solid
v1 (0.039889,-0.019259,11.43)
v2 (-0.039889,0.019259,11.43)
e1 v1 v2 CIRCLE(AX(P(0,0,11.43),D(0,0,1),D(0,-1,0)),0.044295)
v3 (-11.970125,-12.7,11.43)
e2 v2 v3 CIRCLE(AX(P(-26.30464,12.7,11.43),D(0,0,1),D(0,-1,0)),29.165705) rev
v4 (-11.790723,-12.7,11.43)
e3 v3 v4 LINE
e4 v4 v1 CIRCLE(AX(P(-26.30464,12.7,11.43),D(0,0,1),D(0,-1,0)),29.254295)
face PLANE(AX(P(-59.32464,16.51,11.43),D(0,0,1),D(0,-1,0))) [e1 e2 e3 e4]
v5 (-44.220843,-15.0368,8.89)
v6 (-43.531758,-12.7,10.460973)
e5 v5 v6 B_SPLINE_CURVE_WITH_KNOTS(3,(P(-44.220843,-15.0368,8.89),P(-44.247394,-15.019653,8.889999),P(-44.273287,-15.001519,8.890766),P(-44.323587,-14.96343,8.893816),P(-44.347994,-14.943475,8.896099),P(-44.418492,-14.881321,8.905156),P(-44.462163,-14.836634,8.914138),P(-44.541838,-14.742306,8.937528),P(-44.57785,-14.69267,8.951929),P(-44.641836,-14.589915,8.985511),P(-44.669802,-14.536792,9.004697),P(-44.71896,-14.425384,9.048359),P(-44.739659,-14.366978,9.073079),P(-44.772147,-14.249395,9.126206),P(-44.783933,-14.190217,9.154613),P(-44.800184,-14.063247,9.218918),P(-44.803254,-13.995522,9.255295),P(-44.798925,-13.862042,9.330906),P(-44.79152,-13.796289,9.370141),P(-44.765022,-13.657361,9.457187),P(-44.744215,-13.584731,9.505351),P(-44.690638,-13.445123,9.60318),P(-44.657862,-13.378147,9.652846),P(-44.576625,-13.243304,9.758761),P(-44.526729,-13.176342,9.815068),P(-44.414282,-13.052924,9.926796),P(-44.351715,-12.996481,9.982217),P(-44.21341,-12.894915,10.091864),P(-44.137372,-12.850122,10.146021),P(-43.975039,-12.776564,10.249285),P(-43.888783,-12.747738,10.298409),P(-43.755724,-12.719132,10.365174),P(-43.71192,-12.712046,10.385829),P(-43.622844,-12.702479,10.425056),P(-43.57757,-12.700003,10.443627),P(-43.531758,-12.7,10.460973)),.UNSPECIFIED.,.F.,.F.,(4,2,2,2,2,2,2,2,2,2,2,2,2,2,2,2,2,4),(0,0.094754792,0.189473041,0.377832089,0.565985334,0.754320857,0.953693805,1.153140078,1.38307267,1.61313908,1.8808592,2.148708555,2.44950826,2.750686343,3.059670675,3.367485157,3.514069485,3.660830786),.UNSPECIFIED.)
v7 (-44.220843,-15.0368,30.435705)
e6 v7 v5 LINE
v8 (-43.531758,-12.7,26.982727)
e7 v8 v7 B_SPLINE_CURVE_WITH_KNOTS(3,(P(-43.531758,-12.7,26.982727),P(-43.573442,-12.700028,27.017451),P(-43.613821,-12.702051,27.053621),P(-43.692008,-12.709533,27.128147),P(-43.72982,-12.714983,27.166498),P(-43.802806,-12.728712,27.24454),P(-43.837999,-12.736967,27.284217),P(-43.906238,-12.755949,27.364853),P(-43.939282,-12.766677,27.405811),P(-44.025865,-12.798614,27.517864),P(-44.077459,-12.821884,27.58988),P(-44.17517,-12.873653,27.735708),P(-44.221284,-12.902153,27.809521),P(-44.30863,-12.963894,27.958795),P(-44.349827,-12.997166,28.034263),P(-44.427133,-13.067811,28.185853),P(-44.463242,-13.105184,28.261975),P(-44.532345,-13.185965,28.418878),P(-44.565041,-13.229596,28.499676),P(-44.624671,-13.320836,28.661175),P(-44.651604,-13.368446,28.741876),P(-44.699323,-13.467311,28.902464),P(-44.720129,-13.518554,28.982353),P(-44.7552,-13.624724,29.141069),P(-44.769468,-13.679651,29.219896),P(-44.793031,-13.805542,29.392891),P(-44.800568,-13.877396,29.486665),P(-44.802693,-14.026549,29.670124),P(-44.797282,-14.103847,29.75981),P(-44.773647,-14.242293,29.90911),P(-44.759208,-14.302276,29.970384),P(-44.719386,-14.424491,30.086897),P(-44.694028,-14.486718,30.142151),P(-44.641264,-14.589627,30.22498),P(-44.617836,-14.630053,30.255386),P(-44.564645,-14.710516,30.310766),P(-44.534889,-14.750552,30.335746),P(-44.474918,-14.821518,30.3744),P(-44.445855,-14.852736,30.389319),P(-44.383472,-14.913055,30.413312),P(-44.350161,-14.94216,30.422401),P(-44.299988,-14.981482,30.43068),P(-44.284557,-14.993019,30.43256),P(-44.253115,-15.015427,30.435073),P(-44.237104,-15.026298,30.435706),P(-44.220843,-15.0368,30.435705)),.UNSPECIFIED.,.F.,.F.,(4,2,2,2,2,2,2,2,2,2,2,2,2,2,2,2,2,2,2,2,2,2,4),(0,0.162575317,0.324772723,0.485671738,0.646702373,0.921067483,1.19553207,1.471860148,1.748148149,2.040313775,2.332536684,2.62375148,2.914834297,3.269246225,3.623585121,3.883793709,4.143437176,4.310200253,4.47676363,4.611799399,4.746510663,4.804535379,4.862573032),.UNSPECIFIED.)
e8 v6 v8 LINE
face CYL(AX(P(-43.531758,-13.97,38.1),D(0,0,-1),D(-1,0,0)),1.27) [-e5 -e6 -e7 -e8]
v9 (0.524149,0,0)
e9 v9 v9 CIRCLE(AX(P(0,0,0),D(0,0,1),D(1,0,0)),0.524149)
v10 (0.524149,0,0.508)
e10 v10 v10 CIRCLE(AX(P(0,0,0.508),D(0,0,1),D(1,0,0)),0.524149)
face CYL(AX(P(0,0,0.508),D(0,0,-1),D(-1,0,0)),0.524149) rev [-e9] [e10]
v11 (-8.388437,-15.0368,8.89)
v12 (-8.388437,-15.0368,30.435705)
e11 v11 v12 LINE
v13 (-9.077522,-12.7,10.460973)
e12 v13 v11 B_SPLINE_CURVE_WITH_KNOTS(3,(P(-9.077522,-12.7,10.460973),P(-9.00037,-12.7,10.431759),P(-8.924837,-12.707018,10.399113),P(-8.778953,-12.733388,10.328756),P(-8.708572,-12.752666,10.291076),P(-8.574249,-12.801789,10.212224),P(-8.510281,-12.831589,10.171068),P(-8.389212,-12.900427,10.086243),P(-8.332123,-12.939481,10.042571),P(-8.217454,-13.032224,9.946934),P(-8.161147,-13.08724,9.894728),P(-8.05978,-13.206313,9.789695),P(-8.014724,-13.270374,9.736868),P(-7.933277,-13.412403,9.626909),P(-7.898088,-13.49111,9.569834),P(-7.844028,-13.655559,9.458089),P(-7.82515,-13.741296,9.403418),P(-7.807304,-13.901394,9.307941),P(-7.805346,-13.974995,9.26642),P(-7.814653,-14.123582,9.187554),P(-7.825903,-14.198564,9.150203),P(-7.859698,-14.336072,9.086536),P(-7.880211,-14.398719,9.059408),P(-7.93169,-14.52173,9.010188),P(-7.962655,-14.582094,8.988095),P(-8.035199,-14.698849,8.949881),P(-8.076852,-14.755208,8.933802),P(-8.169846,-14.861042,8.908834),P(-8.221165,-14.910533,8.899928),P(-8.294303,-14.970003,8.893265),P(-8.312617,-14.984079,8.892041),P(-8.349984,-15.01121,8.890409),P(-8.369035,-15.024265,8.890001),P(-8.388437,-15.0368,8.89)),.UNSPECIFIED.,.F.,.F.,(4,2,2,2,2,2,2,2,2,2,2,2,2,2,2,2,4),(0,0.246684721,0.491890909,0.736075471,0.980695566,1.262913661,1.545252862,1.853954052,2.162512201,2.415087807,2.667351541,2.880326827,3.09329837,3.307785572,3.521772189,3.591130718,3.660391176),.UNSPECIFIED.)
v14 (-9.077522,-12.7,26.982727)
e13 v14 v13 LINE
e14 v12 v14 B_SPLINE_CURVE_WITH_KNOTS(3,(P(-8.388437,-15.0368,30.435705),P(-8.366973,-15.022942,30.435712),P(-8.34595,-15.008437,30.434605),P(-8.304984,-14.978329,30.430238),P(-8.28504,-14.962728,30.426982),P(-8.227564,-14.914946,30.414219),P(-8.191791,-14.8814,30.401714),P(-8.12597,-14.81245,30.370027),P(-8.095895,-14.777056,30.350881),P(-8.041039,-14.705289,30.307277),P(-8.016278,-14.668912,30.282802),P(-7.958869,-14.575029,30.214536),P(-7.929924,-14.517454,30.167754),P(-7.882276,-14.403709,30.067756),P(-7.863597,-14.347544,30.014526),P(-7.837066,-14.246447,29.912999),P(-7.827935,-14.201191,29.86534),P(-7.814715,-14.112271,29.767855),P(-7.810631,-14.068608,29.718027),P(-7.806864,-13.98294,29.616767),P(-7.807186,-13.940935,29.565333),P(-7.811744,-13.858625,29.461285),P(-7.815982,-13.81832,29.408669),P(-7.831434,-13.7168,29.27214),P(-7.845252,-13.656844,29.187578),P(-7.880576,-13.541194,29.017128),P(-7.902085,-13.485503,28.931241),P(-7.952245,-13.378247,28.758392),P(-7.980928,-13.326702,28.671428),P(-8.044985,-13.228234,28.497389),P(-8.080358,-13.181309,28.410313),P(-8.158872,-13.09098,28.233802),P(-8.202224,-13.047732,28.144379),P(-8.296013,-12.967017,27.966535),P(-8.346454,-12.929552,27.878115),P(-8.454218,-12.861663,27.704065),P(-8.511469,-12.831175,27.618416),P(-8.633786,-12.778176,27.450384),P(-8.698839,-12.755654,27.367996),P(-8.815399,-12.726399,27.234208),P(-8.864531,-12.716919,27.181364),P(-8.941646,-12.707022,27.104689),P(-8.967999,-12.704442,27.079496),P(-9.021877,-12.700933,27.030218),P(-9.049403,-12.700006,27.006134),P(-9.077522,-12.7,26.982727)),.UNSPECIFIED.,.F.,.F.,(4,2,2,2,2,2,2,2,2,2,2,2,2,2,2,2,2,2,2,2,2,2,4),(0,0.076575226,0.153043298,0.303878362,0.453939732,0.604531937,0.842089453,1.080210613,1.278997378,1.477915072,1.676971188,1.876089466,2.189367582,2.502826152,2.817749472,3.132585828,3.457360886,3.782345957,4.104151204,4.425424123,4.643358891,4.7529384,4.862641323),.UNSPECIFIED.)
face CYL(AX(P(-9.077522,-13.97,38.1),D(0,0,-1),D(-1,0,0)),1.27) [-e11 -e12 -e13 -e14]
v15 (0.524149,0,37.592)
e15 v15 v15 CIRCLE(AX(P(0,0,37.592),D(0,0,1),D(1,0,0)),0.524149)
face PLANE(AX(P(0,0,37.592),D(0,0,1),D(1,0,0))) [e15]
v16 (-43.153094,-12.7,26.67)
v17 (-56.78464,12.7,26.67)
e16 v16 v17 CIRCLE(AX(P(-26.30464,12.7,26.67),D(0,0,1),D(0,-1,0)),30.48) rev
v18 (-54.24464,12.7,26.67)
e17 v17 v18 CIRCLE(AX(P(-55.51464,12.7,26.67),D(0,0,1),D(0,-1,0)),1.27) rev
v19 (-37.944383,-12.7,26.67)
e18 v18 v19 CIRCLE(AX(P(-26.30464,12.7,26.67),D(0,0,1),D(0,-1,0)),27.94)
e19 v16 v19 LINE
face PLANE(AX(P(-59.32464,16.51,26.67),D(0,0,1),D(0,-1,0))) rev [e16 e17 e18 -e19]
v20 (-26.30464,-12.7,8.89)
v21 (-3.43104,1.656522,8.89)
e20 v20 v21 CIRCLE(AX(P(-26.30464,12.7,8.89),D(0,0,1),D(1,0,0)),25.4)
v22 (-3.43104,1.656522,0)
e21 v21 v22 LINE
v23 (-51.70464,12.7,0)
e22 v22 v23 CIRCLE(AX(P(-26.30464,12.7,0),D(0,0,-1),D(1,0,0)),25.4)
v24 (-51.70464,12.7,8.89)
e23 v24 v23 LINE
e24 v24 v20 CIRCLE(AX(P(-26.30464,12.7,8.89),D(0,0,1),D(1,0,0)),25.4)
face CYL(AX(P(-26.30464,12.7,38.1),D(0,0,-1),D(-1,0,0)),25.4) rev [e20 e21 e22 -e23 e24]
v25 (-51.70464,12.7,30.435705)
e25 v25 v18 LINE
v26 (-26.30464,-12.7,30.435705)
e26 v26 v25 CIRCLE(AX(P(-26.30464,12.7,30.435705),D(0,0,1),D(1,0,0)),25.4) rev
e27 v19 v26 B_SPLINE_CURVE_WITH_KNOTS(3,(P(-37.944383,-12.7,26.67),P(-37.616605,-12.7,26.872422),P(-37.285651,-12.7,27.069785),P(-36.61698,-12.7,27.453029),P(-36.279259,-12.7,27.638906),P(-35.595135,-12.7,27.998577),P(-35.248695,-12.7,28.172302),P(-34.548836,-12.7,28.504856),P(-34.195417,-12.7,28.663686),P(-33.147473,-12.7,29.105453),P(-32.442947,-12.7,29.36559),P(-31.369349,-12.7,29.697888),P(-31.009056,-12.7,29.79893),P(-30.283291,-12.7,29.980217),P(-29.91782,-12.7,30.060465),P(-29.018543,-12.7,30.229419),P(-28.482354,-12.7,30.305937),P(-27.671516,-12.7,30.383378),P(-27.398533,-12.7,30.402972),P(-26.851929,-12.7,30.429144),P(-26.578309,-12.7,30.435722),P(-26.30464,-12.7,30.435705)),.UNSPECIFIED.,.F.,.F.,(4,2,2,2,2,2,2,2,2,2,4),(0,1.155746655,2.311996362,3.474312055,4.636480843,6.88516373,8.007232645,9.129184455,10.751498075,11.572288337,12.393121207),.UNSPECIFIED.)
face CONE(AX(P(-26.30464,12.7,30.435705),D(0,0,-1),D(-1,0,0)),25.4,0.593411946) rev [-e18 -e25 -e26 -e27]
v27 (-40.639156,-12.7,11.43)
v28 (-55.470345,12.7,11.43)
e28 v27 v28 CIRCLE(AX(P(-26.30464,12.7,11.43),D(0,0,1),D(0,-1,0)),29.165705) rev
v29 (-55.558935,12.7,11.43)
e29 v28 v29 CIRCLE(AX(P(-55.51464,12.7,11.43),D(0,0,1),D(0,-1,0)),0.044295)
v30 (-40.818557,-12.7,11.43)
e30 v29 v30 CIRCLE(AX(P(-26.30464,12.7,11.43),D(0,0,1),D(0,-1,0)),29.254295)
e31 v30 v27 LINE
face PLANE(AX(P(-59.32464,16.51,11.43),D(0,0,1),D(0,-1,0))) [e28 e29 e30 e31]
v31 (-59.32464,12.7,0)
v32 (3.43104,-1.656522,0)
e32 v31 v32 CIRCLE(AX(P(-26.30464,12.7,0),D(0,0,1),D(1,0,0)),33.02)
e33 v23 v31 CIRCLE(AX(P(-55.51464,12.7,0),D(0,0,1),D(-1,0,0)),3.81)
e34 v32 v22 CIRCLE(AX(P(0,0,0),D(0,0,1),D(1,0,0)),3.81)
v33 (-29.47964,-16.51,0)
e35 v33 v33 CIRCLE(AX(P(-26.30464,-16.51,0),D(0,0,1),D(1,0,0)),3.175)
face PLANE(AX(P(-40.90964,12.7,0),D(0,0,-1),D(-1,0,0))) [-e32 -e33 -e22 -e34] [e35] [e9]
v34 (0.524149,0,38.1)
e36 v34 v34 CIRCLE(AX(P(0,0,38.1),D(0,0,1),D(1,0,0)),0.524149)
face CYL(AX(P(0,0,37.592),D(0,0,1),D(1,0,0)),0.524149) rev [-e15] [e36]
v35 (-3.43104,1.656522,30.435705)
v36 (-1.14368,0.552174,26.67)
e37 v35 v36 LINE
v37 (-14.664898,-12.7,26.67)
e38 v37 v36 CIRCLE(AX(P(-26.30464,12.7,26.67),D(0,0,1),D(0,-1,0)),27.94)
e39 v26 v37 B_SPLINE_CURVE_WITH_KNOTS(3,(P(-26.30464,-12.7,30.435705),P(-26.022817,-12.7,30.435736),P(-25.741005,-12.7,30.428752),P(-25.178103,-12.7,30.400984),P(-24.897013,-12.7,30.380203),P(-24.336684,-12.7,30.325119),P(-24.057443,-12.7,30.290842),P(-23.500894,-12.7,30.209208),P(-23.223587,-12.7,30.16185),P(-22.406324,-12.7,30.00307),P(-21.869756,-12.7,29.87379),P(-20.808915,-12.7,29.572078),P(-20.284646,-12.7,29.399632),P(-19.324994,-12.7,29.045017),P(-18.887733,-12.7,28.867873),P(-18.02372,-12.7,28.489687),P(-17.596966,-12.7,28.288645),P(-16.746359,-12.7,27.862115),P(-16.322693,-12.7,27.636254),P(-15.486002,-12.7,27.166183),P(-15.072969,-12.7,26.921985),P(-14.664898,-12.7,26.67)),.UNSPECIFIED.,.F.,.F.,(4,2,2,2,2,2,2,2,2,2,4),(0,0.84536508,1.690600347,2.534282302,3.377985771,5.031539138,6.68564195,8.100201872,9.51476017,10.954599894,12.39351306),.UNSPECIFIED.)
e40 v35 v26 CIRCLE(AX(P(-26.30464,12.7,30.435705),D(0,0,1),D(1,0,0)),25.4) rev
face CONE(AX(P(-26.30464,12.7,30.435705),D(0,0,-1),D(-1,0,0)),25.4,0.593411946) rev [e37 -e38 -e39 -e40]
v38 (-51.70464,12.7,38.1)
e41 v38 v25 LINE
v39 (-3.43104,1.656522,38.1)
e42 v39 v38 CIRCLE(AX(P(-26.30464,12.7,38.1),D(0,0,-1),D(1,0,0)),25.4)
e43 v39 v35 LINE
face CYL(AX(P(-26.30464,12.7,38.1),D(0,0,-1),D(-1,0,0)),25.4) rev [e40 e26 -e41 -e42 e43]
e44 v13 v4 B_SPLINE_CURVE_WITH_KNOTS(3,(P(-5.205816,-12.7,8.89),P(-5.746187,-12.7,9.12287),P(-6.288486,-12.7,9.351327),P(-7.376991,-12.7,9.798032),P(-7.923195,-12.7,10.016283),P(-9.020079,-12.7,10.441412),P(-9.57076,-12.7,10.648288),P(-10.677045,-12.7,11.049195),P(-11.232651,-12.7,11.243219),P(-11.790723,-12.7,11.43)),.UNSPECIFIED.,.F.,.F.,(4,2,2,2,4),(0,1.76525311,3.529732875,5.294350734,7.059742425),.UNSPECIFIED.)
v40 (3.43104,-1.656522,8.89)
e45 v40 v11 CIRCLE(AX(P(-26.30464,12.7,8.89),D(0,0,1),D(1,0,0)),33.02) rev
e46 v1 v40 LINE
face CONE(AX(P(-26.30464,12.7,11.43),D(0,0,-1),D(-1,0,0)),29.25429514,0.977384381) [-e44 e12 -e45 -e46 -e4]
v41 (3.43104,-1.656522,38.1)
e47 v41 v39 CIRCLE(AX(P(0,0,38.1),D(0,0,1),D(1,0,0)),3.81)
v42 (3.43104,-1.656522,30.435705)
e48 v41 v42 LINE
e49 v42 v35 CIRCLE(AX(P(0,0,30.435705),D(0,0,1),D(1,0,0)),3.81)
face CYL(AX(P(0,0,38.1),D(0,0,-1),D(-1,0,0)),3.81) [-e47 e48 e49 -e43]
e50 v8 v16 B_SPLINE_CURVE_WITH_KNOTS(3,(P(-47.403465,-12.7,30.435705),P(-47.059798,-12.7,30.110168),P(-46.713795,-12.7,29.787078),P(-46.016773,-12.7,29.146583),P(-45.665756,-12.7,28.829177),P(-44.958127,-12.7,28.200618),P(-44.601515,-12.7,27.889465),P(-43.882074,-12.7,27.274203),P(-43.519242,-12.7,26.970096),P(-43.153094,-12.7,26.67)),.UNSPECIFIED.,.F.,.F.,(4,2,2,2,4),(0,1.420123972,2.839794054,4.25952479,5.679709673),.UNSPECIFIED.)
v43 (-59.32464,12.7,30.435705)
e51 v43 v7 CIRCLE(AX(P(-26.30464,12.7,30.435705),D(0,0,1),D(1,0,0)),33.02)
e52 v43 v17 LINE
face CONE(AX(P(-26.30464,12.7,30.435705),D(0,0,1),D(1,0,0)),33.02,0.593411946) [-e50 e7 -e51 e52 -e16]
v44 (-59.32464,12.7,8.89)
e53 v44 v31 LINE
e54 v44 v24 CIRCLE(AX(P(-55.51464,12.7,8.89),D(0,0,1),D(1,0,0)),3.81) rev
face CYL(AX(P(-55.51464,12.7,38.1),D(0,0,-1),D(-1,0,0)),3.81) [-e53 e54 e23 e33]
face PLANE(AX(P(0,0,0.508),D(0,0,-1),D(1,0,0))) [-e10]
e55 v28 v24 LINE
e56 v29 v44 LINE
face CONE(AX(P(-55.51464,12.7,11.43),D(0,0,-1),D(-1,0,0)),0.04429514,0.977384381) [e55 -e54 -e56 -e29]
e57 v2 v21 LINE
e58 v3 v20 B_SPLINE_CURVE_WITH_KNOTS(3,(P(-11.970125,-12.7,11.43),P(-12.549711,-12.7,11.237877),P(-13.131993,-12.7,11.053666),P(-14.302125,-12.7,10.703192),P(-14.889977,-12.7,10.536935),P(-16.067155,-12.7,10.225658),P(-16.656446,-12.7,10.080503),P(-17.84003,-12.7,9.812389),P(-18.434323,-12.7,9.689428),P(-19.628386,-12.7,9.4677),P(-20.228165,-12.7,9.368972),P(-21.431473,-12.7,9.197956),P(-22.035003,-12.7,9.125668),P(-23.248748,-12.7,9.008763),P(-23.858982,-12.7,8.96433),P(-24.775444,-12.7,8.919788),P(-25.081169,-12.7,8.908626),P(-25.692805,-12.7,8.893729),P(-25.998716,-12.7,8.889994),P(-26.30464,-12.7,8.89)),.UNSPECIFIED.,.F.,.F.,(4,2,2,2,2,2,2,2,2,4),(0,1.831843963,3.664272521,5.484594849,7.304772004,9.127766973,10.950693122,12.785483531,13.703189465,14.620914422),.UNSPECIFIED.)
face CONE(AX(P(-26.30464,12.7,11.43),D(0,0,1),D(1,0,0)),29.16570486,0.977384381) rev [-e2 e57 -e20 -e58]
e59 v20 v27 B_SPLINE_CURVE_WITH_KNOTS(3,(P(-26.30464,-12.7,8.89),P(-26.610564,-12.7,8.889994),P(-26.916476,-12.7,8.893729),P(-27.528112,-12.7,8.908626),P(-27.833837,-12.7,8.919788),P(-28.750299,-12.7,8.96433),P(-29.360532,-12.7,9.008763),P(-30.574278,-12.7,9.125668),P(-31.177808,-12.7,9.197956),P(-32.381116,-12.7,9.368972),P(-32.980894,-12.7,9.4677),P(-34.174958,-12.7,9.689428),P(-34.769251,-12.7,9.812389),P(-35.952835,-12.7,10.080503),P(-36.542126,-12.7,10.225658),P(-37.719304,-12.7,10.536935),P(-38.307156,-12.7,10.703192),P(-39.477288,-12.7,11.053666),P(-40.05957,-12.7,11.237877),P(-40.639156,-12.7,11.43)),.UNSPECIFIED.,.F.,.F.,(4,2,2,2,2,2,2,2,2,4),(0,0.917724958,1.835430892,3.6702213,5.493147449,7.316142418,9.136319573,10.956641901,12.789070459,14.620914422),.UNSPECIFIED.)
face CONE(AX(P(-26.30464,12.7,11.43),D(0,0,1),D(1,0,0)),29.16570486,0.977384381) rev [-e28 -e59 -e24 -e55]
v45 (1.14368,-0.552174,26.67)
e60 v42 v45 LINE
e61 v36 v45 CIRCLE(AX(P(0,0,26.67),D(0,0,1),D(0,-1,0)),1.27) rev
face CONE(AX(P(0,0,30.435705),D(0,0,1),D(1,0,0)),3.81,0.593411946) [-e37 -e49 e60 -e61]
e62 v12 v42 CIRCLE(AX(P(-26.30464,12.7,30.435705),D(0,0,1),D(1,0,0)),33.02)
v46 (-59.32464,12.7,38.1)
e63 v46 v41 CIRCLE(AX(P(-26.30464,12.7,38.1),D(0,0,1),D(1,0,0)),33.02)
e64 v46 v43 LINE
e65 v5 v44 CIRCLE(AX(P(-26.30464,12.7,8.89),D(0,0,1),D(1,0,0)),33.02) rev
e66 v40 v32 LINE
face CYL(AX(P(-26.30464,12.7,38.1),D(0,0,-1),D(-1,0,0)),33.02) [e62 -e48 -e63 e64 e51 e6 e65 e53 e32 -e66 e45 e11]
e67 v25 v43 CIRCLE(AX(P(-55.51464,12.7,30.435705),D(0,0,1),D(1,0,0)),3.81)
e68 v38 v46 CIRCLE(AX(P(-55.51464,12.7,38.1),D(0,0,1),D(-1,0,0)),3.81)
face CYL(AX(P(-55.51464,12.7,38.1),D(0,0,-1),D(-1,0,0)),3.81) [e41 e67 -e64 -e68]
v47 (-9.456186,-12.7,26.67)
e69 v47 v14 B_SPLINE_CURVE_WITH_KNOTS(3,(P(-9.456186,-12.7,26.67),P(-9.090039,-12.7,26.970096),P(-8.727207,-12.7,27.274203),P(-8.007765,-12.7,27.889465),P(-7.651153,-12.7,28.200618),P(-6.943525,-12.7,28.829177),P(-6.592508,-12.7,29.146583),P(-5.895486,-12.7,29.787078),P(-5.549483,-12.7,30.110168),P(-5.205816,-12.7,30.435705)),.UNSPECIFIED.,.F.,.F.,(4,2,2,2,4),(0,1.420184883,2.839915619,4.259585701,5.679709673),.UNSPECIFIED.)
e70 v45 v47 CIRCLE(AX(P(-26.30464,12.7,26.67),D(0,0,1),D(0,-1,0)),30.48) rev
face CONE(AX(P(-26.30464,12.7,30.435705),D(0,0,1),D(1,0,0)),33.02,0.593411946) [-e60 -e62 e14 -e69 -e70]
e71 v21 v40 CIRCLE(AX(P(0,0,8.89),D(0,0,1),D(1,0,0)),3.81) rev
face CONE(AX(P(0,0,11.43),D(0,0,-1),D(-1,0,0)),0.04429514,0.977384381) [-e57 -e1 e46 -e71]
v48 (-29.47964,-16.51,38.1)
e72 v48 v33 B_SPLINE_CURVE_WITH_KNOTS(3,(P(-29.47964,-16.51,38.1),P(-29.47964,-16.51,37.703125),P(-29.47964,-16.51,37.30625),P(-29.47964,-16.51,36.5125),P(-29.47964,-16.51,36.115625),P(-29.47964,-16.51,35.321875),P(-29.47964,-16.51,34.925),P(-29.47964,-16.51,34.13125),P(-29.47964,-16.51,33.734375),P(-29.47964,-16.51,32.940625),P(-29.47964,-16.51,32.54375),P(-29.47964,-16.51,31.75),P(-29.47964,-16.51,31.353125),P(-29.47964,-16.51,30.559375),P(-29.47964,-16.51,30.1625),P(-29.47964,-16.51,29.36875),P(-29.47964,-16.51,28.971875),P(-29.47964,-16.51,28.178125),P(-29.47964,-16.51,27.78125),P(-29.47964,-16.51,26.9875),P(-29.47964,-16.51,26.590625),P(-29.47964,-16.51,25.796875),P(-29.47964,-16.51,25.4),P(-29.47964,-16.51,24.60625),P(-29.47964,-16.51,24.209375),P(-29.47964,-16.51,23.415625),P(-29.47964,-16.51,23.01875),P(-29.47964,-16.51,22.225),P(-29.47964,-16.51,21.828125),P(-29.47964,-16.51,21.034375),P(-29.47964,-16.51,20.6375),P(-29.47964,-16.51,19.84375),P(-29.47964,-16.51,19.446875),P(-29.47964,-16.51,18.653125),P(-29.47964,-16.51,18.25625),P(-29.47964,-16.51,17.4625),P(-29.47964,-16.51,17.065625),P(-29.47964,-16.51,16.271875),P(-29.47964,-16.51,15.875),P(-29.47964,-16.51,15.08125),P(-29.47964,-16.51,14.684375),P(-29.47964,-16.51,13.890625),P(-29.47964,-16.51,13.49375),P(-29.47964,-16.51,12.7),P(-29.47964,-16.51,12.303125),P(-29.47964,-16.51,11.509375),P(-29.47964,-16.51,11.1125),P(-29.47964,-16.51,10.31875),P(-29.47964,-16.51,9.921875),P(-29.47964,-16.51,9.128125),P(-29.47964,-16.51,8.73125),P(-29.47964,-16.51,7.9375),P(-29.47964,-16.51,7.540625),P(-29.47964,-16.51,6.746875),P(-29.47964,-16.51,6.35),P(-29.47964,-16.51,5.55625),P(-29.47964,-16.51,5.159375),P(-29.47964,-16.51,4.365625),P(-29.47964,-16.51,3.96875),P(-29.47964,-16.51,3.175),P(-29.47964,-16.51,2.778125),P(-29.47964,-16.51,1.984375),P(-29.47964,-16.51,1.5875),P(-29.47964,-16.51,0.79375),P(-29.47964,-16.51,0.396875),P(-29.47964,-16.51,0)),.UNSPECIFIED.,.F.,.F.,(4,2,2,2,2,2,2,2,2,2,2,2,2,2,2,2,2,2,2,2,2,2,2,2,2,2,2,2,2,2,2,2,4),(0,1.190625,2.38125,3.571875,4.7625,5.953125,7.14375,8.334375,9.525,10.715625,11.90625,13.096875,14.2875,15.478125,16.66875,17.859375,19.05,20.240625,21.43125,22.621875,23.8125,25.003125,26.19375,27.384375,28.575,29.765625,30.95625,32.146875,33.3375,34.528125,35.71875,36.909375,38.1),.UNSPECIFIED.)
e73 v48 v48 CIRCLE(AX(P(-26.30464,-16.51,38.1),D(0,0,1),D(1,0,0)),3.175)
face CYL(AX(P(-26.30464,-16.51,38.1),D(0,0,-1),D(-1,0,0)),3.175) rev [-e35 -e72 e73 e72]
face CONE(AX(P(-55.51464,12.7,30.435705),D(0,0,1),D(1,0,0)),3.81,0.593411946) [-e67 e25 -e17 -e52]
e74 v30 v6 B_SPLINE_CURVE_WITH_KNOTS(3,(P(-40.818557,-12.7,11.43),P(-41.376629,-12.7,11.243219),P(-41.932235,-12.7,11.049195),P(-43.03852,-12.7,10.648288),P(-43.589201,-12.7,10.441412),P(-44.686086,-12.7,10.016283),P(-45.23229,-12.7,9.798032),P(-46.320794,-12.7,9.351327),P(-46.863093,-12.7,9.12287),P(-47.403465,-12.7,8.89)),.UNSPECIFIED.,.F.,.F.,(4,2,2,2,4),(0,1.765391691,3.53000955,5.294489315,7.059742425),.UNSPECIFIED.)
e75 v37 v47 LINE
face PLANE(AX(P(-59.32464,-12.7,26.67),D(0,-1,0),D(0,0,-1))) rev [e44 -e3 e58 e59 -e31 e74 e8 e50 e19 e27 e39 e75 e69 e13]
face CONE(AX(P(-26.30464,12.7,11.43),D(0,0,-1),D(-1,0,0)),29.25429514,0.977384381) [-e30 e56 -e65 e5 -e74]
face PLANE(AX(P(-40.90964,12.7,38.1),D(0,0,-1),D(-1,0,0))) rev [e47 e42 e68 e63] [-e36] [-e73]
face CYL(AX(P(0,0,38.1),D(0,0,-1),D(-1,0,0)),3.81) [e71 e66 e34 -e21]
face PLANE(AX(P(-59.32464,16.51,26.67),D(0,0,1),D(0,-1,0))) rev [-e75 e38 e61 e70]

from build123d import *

# Parameters (mm, degrees)
SKETCH1_R               = 3.175
BOSS_EXTRUDE1_DEPTH     = 38.1
SKETCH2_R               = 0.524148551
CUT_EXTRUDE1_DEPTH      = 0.508
CUT_EXTRUDE2_DEPTH      = 74.375236584
CUT_EXTRUDE2_DEPTH_BACK = 74.375236584
SKETCH4_W               = 15.24
SKETCH4_H               = 29.21
CHAMFER1_SIZE           = 3.76570486
CHAMFER1_SIZE_2         = 2.54
FILLET1_R               = 1.27


with BuildPart() as part:
    # Sketch1 → Boss-Extrude1 (new body)
    with BuildSketch(Plane.XY):
        with BuildLine():
            ThreePointArc((3.431040036, -1.656521739), (1.656521739, 3.431040036), (-3.431040036, 1.656521739))
            ThreePointArc((-3.431040036, 1.656521739), (-31.969026999, -12.060345778), (-51.704640275, 12.7))
            ThreePointArc((-51.704640275, 12.7), (-55.514640275, 16.51), (-59.324640275, 12.7))
            ThreePointArc((-59.324640275, 12.7), (-33.668343017, -19.488449511), (3.431040036, -1.656521739))
        make_face()
        with Locations(Location((-26.304640275, -16.51, 0), (0, 0, 180))):
            Circle(SKETCH1_R, mode=Mode.SUBTRACT)
    extrude(amount=BOSS_EXTRUDE1_DEPTH)

    # Sketch2 → Cut-Extrude1 (cut)
    with BuildSketch(Plane.XY.offset(38.1)):
        Circle(SKETCH2_R)
    cut_extrude1 = extrude(amount=-CUT_EXTRUDE1_DEPTH, mode=Mode.SUBTRACT)

    # Mirror1: Cut-Extrude1 across plane
    add(cut_extrude1.mirror(Plane.XY.offset(19.05)), mode=Mode.SUBTRACT)

    # Sketch4 → Cut-Extrude2 (cut, two sides: drawn at the far end of the back side and taken through both)
    with BuildSketch(Plane(origin=(0, 0, 0), x_dir=(0, 0, -1), z_dir=(1, 0, 0)).offset(-CUT_EXTRUDE2_DEPTH_BACK)):
        with Locations((-19.05, 1.905)):
            Rectangle(SKETCH4_W, SKETCH4_H)
    extrude(amount=CUT_EXTRUDE2_DEPTH + CUT_EXTRUDE2_DEPTH_BACK, mode=Mode.SUBTRACT)

    # Chamfer1
    # the kernel refuses this chamfer: 3.76570486, 2.54 mm, written as the material it takes off along each edge
    with BuildSketch(Plane(origin=(-26.304640275, 12.7, 26.67), x_dir=(0.9005354424873034, -0.43478260869565205, 0), z_dir=(0.43478260869565205, 0.9005354424873034, 0))) as chamfer1_piece_1_section:
        Polygon((25.4, -CHAMFER1_SIZE), (25.4 + CHAMFER1_SIZE_2, 0), (25.4, 0), align=None)
    chamfer1_piece_1 = revolve(axis=Axis((-26.304640275, 12.7, 26.67), (0, 0, -1)), revolution_arc=64.228538259, mode=Mode.PRIVATE)
    chamfer1_piece_1 = split(chamfer1_piece_1, bisect_by=Plane(origin=(-26.304640275, -12.7, 26.67), z_dir=(0, 1, 0)), keep=Keep.TOP, mode=Mode.PRIVATE)
    add(chamfer1_piece_1, mode=Mode.SUBTRACT)
    with BuildSketch(Plane(origin=(-26.304640275, 12.7, 26.67), x_dir=(0.9005354424873037, -0.43478260869565155, 0), z_dir=(0.43478260869565155, 0.9005354424873037, 0))) as chamfer1_piece_2_section:
        Polygon((33.02, -CHAMFER1_SIZE), (33.02 - CHAMFER1_SIZE_2, 0), (33.02, 0), align=None)
    chamfer1_piece_2 = revolve(axis=Axis((-26.304640275, 12.7, 26.67), (0, 0, -1)), revolution_arc=41.395045941, mode=Mode.PRIVATE)
    chamfer1_piece_2 = split(chamfer1_piece_2, bisect_by=Plane(origin=(-26.304640275, -12.7, 26.67), z_dir=(0, 1, 0)), keep=Keep.TOP, mode=Mode.PRIVATE)
    add(chamfer1_piece_2, mode=Mode.SUBTRACT)
    with BuildSketch(Plane(origin=(0, 0, 26.67), x_dir=(-0.9005354424873006, 0.4347826086956581, 0), z_dir=(-0.4347826086956581, -0.9005354424873006, 0))) as chamfer1_piece_3:
        Polygon((3.81, -CHAMFER1_SIZE), (3.81 - CHAMFER1_SIZE_2, 0), (3.81, 0), align=None)
    revolve(axis=Axis((0, 0, 26.67), (0, 0, -1)), revolution_arc=180, mode=Mode.SUBTRACT)
    with BuildSketch(Plane(origin=(-26.304640275, 12.7, 26.67), x_dir=(0, -1, 0), z_dir=(1, 0, 0))) as chamfer1_piece_4_section:
        Polygon((25.4 + CHAMFER1_SIZE_2, 0), (25.4, -CHAMFER1_SIZE), (25.4, 0), align=None)
    chamfer1_piece_4 = revolve(axis=Axis((-26.304640275, 12.7, 26.67), (0, 0, -1)), revolution_arc=90, mode=Mode.PRIVATE)
    chamfer1_piece_4 = split(chamfer1_piece_4, bisect_by=Plane(origin=(-26.304640275, -12.7, 26.67), z_dir=(0, 1, 0)), keep=Keep.TOP, mode=Mode.PRIVATE)
    add(chamfer1_piece_4, mode=Mode.SUBTRACT)
    with BuildSketch(Plane(origin=(-55.514640275, 12.7, 26.67), x_dir=(1, 0, 0), z_dir=(0, -1, 0))) as chamfer1_piece_5:
        Polygon((3.81 - CHAMFER1_SIZE_2, 0), (3.81, CHAMFER1_SIZE), (3.81, 0), align=None)
    revolve(axis=Axis((-55.514640275, 12.7, 26.67), (0, 0, 1)), revolution_arc=180, mode=Mode.SUBTRACT)
    with BuildSketch(Plane(origin=(-26.304640275, 12.7, 26.67), x_dir=(-0.38802844135428005, -0.9216473993345654, 0), z_dir=(0.9216473993345654, -0.38802844135428005, 0))) as chamfer1_piece_6_section:
        Polygon((33.02, -CHAMFER1_SIZE), (33.02 - CHAMFER1_SIZE_2, 0), (33.02, 0), align=None)
    chamfer1_piece_6 = revolve(axis=Axis((-26.304640275, 12.7, 26.67), (0, 0, -1)), revolution_arc=67.168121234, mode=Mode.PRIVATE)
    chamfer1_piece_6 = split(chamfer1_piece_6, bisect_by=Plane(origin=(-26.304640275, -12.7, 26.67), z_dir=(0, 1, 0)), keep=Keep.TOP, mode=Mode.PRIVATE)
    add(chamfer1_piece_6, mode=Mode.SUBTRACT)
    with BuildSketch(Plane(origin=(-26.304640275, 12.7, 11.43), x_dir=(0.9005354424873034, -0.43478260869565205, 0), z_dir=(0.43478260869565205, 0.9005354424873034, 0))) as chamfer1_piece_7_section:
        Polygon((25.4, CHAMFER1_SIZE_2), (25.4 + CHAMFER1_SIZE, 0), (25.4, 0), align=None)
    chamfer1_piece_7 = revolve(axis=Axis((-26.304640275, 12.7, 11.43), (0, 0, -1)), revolution_arc=64.228538259, mode=Mode.PRIVATE)
    chamfer1_piece_7 = split(chamfer1_piece_7, bisect_by=Plane(origin=(-26.304640275, -12.7, 11.43), z_dir=(0, 1, 0)), keep=Keep.TOP, mode=Mode.PRIVATE)
    add(chamfer1_piece_7, mode=Mode.SUBTRACT)
    with BuildSketch(Plane(origin=(-26.304640275, 12.7, 11.43), x_dir=(0, -1, 0), z_dir=(1, 0, 0))) as chamfer1_piece_8_section:
        Polygon((25.4, CHAMFER1_SIZE_2), (25.4 + CHAMFER1_SIZE, 0), (25.4, 0), align=None)
    chamfer1_piece_8 = revolve(axis=Axis((-26.304640275, 12.7, 11.43), (0, 0, -1)), revolution_arc=90, mode=Mode.PRIVATE)
    chamfer1_piece_8 = split(chamfer1_piece_8, bisect_by=Plane(origin=(-26.304640275, -12.7, 11.43), z_dir=(0, 1, 0)), keep=Keep.TOP, mode=Mode.PRIVATE)
    add(chamfer1_piece_8, mode=Mode.SUBTRACT)
    with BuildSketch(Plane(origin=(-26.304640275, 12.7, 11.43), x_dir=(-0.38802844135427855, -0.9216473993345662, 0), z_dir=(0.9216473993345662, -0.38802844135427855, 0))) as chamfer1_piece_9_section:
        Polygon((33.02, CHAMFER1_SIZE_2), (33.02 - CHAMFER1_SIZE, 0), (33.02, 0), align=None)
    chamfer1_piece_9 = revolve(axis=Axis((-26.304640275, 12.7, 11.43), (0, 0, -1)), revolution_arc=67.168121234, mode=Mode.PRIVATE)
    chamfer1_piece_9 = split(chamfer1_piece_9, bisect_by=Plane(origin=(-26.304640275, -12.7, 11.43), z_dir=(0, 1, 0)), keep=Keep.TOP, mode=Mode.PRIVATE)
    add(chamfer1_piece_9, mode=Mode.SUBTRACT)
    with BuildSketch(Plane(origin=(-26.304640275, 12.7, 11.43), x_dir=(0.9005354424873037, -0.43478260869565155, 0), z_dir=(0.43478260869565155, 0.9005354424873037, 0))) as chamfer1_piece_10_section:
        Polygon((33.02, CHAMFER1_SIZE_2), (33.02 - CHAMFER1_SIZE, 0), (33.02, 0), align=None)
    chamfer1_piece_10 = revolve(axis=Axis((-26.304640275, 12.7, 11.43), (0, 0, -1)), revolution_arc=41.395045941, mode=Mode.PRIVATE)
    chamfer1_piece_10 = split(chamfer1_piece_10, bisect_by=Plane(origin=(-26.304640275, -12.7, 11.43), z_dir=(0, 1, 0)), keep=Keep.TOP, mode=Mode.PRIVATE)
    add(chamfer1_piece_10, mode=Mode.SUBTRACT)
    with BuildSketch(Plane(origin=(-55.514640275, 12.7, 11.43), x_dir=(1, 0, 0), z_dir=(0, -1, 0))) as chamfer1_piece_11:
        Polygon((3.81, -CHAMFER1_SIZE_2), (3.81 - CHAMFER1_SIZE, 0), (3.81, 0), align=None)
    revolve(axis=Axis((-55.514640275, 12.7, 11.43), (0, 0, 1)), revolution_arc=180, mode=Mode.SUBTRACT)
    with BuildSketch(Plane(origin=(0, 0, 11.43), x_dir=(-0.9005354424873006, 0.4347826086956581, 0), z_dir=(-0.4347826086956581, -0.9005354424873006, 0))) as chamfer1_piece_12:
        Polygon((3.81 - CHAMFER1_SIZE, 0), (3.81, CHAMFER1_SIZE_2), (3.81, 0), align=None)
    revolve(axis=Axis((0, 0, 11.43), (0, 0, -1)), revolution_arc=180, mode=Mode.SUBTRACT)

    # Fillet1
    fillet1_edges = [part.edges().sort_by_distance(p)[0] for p in [
        (-5.205815663, -12.7, 19.66285243),
        (-47.403464887, -12.7, 19.66285243),
    ]]
    fillet(fillet1_edges, radius=FILLET1_R)


solid = part.part
